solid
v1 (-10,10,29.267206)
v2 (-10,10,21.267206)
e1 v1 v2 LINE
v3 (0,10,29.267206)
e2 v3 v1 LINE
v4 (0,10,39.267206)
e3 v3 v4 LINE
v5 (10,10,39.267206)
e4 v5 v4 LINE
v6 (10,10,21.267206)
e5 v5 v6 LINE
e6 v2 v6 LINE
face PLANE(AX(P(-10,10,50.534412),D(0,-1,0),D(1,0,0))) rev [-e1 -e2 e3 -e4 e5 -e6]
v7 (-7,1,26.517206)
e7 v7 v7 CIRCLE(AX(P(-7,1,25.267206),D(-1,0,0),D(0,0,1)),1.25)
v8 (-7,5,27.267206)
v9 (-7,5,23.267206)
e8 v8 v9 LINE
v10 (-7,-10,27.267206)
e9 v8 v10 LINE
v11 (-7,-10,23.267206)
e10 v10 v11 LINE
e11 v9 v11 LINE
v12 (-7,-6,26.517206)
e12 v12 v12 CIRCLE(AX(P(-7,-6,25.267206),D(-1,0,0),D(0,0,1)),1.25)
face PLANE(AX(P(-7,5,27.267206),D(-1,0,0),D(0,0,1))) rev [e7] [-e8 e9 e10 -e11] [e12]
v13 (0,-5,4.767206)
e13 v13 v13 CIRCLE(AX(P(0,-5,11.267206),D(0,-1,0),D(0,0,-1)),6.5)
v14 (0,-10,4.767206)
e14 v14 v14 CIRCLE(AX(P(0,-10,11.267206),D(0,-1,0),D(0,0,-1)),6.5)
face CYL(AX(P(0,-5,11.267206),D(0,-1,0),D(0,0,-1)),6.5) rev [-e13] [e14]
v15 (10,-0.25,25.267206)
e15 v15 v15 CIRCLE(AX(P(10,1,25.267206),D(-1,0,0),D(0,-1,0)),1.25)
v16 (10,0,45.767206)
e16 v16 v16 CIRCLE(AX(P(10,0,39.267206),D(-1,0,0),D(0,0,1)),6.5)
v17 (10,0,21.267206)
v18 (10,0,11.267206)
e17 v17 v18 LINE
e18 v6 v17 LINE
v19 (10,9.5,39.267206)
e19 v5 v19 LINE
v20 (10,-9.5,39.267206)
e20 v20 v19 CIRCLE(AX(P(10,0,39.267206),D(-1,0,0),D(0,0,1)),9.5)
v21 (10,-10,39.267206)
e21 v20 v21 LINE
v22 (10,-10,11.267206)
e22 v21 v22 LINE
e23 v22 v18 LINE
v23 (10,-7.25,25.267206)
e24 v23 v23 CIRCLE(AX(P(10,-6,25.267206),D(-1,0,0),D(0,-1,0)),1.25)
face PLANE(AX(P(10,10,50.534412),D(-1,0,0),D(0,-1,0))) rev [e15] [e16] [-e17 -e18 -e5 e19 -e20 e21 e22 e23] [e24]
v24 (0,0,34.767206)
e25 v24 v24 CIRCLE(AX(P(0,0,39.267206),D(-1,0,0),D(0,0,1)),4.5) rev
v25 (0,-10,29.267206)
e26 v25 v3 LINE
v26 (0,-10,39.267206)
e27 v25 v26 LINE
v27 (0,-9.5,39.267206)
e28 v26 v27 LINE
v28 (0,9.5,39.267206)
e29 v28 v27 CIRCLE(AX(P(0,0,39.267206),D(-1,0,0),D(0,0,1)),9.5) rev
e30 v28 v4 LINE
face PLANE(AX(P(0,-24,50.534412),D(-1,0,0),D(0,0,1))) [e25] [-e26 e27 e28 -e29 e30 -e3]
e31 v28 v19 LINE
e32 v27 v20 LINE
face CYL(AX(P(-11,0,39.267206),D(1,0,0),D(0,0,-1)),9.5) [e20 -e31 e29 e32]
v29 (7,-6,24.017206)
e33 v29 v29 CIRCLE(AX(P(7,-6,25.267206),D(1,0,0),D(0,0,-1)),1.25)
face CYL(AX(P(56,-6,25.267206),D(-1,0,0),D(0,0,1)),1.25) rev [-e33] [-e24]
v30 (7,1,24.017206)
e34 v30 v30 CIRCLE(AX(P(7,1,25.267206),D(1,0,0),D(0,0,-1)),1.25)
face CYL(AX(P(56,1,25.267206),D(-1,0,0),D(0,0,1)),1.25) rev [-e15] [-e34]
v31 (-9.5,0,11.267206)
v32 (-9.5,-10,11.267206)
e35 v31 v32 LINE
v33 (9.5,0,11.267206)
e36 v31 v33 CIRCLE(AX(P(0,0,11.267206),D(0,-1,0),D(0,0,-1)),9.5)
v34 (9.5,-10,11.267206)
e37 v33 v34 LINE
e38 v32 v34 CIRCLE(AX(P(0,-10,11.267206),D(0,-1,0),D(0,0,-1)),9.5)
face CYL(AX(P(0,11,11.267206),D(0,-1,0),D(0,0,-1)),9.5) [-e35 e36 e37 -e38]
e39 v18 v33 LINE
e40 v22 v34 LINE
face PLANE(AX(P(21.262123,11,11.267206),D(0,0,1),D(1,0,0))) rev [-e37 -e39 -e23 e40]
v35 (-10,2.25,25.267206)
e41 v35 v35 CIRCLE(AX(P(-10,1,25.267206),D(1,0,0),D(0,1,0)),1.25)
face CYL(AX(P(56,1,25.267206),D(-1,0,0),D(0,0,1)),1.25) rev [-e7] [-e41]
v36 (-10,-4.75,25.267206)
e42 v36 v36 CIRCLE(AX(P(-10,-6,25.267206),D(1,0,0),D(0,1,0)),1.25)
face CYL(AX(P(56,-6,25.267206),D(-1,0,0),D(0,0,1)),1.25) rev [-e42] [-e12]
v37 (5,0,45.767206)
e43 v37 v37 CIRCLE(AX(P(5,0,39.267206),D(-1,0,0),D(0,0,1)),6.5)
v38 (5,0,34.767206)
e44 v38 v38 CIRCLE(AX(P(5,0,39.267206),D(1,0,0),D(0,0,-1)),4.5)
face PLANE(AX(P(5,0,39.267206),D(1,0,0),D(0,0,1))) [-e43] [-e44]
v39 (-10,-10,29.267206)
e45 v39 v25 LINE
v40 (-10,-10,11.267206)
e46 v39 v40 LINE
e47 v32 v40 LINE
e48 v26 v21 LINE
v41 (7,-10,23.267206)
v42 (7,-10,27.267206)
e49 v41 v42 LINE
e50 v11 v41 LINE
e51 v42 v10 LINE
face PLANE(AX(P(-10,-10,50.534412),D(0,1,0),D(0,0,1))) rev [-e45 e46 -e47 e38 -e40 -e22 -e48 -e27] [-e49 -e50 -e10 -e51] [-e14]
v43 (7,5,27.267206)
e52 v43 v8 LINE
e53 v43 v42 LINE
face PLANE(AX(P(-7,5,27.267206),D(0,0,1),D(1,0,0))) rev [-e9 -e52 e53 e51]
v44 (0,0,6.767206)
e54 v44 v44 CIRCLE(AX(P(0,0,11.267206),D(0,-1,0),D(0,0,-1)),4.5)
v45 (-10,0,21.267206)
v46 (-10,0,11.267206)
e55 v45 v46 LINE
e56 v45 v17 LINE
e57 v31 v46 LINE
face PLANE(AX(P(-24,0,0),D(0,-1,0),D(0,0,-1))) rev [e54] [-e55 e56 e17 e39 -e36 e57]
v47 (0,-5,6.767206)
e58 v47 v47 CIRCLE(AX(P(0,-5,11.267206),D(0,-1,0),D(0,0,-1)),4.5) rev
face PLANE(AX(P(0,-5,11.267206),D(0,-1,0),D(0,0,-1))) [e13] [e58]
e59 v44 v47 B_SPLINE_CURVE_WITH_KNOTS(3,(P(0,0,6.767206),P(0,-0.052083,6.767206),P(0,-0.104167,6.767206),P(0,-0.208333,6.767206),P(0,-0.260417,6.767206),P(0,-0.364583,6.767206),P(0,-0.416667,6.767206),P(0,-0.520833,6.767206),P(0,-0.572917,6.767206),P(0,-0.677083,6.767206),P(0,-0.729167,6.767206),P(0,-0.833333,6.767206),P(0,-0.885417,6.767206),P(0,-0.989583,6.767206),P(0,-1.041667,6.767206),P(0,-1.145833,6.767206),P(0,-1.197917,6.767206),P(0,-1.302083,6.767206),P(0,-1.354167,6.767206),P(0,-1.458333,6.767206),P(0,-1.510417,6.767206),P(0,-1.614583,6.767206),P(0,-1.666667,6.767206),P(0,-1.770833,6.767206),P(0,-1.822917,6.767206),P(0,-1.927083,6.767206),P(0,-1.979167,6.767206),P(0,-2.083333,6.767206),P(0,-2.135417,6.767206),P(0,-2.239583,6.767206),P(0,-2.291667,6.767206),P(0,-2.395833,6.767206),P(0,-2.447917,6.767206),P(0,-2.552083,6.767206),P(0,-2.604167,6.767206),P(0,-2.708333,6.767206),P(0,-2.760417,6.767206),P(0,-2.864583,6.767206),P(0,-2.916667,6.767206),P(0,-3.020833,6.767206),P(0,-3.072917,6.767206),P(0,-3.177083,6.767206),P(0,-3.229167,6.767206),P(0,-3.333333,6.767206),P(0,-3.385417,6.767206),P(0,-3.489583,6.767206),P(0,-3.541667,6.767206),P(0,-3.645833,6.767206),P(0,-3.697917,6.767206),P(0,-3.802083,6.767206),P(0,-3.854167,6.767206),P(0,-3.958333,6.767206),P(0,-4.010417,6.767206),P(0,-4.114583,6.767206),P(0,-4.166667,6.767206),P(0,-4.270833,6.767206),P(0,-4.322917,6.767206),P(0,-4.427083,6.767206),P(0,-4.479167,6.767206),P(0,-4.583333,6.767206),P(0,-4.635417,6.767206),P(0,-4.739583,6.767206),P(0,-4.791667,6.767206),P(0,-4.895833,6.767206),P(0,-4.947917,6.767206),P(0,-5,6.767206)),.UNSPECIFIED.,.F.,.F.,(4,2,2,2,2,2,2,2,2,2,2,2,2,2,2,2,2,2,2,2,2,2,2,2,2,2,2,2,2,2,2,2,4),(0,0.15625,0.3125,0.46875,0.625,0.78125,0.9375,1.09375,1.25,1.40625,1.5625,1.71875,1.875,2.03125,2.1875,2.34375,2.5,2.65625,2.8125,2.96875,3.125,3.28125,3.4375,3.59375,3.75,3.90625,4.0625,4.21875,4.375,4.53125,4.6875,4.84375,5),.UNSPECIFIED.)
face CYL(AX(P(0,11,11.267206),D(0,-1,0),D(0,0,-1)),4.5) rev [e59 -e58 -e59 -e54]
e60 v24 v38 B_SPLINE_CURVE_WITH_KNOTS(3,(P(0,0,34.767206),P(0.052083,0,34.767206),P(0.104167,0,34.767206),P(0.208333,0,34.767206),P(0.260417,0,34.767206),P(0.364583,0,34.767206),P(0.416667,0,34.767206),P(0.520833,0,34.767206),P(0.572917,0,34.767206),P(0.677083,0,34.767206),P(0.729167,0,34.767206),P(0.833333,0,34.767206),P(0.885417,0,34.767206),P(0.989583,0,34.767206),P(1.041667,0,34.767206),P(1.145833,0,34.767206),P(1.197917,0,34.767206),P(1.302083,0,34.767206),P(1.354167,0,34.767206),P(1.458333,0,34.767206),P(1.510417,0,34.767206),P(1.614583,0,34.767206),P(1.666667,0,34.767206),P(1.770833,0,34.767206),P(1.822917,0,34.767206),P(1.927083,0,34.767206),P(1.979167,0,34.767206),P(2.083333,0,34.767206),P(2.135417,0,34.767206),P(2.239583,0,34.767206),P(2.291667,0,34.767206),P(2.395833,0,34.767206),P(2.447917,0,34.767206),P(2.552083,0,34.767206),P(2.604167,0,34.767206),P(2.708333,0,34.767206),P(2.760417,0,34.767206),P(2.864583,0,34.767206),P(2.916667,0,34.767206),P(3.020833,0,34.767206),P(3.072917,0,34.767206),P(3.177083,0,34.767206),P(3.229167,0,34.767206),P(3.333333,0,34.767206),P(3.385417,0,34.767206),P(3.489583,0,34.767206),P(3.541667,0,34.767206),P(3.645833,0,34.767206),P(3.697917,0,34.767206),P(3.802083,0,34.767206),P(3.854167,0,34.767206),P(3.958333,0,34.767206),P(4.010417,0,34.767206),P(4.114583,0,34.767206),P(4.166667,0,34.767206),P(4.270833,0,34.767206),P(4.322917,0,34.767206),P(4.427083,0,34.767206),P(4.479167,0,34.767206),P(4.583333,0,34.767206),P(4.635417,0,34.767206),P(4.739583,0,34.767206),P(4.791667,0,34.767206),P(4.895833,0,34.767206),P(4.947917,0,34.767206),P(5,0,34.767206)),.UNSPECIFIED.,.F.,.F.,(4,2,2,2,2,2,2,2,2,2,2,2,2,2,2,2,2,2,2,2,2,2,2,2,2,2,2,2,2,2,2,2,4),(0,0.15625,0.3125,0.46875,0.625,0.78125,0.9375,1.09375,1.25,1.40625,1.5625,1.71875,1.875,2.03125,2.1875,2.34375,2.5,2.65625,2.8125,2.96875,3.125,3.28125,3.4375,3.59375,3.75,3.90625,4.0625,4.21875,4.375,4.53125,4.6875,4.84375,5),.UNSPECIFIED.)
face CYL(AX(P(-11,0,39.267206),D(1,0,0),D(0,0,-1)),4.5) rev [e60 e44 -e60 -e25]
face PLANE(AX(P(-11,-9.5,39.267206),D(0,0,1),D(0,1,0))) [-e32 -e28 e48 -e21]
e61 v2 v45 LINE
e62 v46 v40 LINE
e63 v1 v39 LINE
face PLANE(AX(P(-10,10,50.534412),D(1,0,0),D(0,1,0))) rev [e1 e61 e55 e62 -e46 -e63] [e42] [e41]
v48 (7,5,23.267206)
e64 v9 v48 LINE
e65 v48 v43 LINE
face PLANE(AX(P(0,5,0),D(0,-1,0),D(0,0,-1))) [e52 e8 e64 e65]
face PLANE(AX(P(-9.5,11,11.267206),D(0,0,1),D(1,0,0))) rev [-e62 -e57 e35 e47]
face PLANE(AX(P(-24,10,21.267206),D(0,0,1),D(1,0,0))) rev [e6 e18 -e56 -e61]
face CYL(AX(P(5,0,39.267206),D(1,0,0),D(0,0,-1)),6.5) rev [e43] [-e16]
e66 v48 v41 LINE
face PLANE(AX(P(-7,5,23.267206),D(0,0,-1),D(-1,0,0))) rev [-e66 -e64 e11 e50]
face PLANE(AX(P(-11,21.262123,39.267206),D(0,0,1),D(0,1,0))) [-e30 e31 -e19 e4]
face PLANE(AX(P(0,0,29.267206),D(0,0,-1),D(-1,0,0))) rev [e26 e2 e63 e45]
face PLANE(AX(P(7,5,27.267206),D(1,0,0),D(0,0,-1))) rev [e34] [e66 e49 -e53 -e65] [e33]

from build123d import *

# Parameters (mm, degrees)
SKETCH_1_W                = 20
SKETCH_1_H                = 20
EXTRUDE_1_DEPTH           = 50.534412113
SKETCH_7_W                = 21.267206056
SKETCH_7_H                = 10
CUT_EXTRUDE_6_DEPTH       = 34
SKETCH_3_R                = 4.5
CUT_EXTRUDE_2_DEPTH       = 21
SKETCH_2_R                = 6.5
CUT_EXTRUDE_9_DEPTH       = 5
MOVE_BODY_1_ANGLE         = 90
SKETCH_8_W                = 20
SKETCH_8_H                = 20
EXTRUDE_2_DEPTH           = 8
SKETCH_9_W                = 14
SKETCH_9_H                = 4
CUT_EXTRUDE_10_DEPTH      = 15
CUT_EXTRUDE_11_DEPTH      = 49
CUT_EXTRUDE_11_DEPTH_BACK = 49
SKETCH_10_R               = 1.25


# Read off the part's stored shape, not the designer's step: 교차3
with BuildPart() as part:
    # 스케치1 → 보스-돌출1 (new body)
    with BuildSketch(Plane.XY):
        Rectangle(SKETCH_1_W, SKETCH_1_H)
    extrude(amount=EXTRUDE_1_DEPTH)

    # 스케치7 → 컷-돌출6 (cut)
    with BuildSketch(Plane(origin=(10, 0, 0), x_dir=(0, 0, -1), z_dir=(1, 0, 0))):
        with Locations((-10.633603028, 5)):
            Rectangle(SKETCH_7_W, SKETCH_7_H)
    cut_extrude_6 = extrude(amount=-CUT_EXTRUDE_6_DEPTH, mode=Mode.SUBTRACT)

    # 스케치3 → 컷-돌출2 (cut)
    with BuildSketch(Plane(origin=(0, -10, 0), x_dir=(-1, 0, 0), z_dir=(0, -1, 0))):
        with Locations(Location((0, -11.267206056, 0), (0, 0, 90))):
            Circle(SKETCH_3_R)
        with BuildLine():
            Line((-21.262122506, -11.267206056), (-9.5, -11.267206056))
            ThreePointArc((-9.5, -11.267206056), (0, -1.767206056), (9.5, -11.267206056))
            Line((9.5, -11.267206056), (21.262122506, -11.267206056))
            ThreePointArc((21.262122506, -11.267206056), (0, 9.99491645), (-21.262122506, -11.267206056))
        make_face()
    cut_extrude_2 = extrude(amount=-CUT_EXTRUDE_2_DEPTH, mode=Mode.SUBTRACT)

    # 스케치2 → 컷-돌출9 (cut)
    with BuildSketch(Plane(origin=(0, -10, 0), x_dir=(-1, 0, 0), z_dir=(0, -1, 0))):
        with Locations(Location((0, -11.267206056, 0), (0, 0, 90))):
            Circle(SKETCH_2_R)
    cut_extrude_9 = extrude(amount=-CUT_EXTRUDE_9_DEPTH, mode=Mode.SUBTRACT)

    # 대칭 복사6: 컷-돌출6, 컷-돌출2, 컷-돌출9 across plane
    add(cut_extrude_6.mirror(Plane.XY.offset(25.267206056)), mode=Mode.SUBTRACT)
    add(cut_extrude_2.mirror(Plane.XY.offset(25.267206056)), mode=Mode.SUBTRACT)
    add(cut_extrude_9.mirror(Plane.XY.offset(25.267206056)), mode=Mode.SUBTRACT)


with BuildPart() as body_2:
    # 교차3: the piece on the far side of the plane
    add(part.part)
    split(bisect_by=Plane.XY.offset(25.267206056), keep=Keep.BOTTOM)


with BuildPart() as part_1:
    add(part.part)

    # 교차3
    split(bisect_by=Plane.XY.offset(25.267206056), keep=Keep.TOP)


with BuildPart() as part_2:
    # Move Body 1: moved
    add(part_1.part.rotate(Axis((0, 0, 0), (0, 0, 1)), MOVE_BODY_1_ANGLE))


    add(body_2.part)  # 보스-돌출2 merges body 2
    # 스케치8 → 보스-돌출2 (add)
    with BuildSketch(Plane.XY.offset(21.267206056)):
        Rectangle(SKETCH_8_W, SKETCH_8_H)
    extrude(amount=EXTRUDE_2_DEPTH)

    # 스케치9 → 컷-돌출10 (cut)
    with BuildSketch(Plane.XZ.offset(10)):
        with Locations((0, 25.267206056)):
            Rectangle(SKETCH_9_W, SKETCH_9_H)
    extrude(amount=-CUT_EXTRUDE_10_DEPTH, mode=Mode.SUBTRACT)

    # 스케치10 → 컷-돌출11 (cut, two sides: drawn at the far end of the back side and taken through both)
    with BuildSketch(Plane.ZY.offset(-7).offset(-CUT_EXTRUDE_11_DEPTH_BACK)):
        with Locations((25.267206056, -6)):
            Circle(SKETCH_10_R)
        with Locations((25.267206056, 1)):
            Circle(SKETCH_10_R)
    extrude(amount=CUT_EXTRUDE_11_DEPTH + CUT_EXTRUDE_11_DEPTH_BACK, mode=Mode.SUBTRACT)


solid = part_2.part
